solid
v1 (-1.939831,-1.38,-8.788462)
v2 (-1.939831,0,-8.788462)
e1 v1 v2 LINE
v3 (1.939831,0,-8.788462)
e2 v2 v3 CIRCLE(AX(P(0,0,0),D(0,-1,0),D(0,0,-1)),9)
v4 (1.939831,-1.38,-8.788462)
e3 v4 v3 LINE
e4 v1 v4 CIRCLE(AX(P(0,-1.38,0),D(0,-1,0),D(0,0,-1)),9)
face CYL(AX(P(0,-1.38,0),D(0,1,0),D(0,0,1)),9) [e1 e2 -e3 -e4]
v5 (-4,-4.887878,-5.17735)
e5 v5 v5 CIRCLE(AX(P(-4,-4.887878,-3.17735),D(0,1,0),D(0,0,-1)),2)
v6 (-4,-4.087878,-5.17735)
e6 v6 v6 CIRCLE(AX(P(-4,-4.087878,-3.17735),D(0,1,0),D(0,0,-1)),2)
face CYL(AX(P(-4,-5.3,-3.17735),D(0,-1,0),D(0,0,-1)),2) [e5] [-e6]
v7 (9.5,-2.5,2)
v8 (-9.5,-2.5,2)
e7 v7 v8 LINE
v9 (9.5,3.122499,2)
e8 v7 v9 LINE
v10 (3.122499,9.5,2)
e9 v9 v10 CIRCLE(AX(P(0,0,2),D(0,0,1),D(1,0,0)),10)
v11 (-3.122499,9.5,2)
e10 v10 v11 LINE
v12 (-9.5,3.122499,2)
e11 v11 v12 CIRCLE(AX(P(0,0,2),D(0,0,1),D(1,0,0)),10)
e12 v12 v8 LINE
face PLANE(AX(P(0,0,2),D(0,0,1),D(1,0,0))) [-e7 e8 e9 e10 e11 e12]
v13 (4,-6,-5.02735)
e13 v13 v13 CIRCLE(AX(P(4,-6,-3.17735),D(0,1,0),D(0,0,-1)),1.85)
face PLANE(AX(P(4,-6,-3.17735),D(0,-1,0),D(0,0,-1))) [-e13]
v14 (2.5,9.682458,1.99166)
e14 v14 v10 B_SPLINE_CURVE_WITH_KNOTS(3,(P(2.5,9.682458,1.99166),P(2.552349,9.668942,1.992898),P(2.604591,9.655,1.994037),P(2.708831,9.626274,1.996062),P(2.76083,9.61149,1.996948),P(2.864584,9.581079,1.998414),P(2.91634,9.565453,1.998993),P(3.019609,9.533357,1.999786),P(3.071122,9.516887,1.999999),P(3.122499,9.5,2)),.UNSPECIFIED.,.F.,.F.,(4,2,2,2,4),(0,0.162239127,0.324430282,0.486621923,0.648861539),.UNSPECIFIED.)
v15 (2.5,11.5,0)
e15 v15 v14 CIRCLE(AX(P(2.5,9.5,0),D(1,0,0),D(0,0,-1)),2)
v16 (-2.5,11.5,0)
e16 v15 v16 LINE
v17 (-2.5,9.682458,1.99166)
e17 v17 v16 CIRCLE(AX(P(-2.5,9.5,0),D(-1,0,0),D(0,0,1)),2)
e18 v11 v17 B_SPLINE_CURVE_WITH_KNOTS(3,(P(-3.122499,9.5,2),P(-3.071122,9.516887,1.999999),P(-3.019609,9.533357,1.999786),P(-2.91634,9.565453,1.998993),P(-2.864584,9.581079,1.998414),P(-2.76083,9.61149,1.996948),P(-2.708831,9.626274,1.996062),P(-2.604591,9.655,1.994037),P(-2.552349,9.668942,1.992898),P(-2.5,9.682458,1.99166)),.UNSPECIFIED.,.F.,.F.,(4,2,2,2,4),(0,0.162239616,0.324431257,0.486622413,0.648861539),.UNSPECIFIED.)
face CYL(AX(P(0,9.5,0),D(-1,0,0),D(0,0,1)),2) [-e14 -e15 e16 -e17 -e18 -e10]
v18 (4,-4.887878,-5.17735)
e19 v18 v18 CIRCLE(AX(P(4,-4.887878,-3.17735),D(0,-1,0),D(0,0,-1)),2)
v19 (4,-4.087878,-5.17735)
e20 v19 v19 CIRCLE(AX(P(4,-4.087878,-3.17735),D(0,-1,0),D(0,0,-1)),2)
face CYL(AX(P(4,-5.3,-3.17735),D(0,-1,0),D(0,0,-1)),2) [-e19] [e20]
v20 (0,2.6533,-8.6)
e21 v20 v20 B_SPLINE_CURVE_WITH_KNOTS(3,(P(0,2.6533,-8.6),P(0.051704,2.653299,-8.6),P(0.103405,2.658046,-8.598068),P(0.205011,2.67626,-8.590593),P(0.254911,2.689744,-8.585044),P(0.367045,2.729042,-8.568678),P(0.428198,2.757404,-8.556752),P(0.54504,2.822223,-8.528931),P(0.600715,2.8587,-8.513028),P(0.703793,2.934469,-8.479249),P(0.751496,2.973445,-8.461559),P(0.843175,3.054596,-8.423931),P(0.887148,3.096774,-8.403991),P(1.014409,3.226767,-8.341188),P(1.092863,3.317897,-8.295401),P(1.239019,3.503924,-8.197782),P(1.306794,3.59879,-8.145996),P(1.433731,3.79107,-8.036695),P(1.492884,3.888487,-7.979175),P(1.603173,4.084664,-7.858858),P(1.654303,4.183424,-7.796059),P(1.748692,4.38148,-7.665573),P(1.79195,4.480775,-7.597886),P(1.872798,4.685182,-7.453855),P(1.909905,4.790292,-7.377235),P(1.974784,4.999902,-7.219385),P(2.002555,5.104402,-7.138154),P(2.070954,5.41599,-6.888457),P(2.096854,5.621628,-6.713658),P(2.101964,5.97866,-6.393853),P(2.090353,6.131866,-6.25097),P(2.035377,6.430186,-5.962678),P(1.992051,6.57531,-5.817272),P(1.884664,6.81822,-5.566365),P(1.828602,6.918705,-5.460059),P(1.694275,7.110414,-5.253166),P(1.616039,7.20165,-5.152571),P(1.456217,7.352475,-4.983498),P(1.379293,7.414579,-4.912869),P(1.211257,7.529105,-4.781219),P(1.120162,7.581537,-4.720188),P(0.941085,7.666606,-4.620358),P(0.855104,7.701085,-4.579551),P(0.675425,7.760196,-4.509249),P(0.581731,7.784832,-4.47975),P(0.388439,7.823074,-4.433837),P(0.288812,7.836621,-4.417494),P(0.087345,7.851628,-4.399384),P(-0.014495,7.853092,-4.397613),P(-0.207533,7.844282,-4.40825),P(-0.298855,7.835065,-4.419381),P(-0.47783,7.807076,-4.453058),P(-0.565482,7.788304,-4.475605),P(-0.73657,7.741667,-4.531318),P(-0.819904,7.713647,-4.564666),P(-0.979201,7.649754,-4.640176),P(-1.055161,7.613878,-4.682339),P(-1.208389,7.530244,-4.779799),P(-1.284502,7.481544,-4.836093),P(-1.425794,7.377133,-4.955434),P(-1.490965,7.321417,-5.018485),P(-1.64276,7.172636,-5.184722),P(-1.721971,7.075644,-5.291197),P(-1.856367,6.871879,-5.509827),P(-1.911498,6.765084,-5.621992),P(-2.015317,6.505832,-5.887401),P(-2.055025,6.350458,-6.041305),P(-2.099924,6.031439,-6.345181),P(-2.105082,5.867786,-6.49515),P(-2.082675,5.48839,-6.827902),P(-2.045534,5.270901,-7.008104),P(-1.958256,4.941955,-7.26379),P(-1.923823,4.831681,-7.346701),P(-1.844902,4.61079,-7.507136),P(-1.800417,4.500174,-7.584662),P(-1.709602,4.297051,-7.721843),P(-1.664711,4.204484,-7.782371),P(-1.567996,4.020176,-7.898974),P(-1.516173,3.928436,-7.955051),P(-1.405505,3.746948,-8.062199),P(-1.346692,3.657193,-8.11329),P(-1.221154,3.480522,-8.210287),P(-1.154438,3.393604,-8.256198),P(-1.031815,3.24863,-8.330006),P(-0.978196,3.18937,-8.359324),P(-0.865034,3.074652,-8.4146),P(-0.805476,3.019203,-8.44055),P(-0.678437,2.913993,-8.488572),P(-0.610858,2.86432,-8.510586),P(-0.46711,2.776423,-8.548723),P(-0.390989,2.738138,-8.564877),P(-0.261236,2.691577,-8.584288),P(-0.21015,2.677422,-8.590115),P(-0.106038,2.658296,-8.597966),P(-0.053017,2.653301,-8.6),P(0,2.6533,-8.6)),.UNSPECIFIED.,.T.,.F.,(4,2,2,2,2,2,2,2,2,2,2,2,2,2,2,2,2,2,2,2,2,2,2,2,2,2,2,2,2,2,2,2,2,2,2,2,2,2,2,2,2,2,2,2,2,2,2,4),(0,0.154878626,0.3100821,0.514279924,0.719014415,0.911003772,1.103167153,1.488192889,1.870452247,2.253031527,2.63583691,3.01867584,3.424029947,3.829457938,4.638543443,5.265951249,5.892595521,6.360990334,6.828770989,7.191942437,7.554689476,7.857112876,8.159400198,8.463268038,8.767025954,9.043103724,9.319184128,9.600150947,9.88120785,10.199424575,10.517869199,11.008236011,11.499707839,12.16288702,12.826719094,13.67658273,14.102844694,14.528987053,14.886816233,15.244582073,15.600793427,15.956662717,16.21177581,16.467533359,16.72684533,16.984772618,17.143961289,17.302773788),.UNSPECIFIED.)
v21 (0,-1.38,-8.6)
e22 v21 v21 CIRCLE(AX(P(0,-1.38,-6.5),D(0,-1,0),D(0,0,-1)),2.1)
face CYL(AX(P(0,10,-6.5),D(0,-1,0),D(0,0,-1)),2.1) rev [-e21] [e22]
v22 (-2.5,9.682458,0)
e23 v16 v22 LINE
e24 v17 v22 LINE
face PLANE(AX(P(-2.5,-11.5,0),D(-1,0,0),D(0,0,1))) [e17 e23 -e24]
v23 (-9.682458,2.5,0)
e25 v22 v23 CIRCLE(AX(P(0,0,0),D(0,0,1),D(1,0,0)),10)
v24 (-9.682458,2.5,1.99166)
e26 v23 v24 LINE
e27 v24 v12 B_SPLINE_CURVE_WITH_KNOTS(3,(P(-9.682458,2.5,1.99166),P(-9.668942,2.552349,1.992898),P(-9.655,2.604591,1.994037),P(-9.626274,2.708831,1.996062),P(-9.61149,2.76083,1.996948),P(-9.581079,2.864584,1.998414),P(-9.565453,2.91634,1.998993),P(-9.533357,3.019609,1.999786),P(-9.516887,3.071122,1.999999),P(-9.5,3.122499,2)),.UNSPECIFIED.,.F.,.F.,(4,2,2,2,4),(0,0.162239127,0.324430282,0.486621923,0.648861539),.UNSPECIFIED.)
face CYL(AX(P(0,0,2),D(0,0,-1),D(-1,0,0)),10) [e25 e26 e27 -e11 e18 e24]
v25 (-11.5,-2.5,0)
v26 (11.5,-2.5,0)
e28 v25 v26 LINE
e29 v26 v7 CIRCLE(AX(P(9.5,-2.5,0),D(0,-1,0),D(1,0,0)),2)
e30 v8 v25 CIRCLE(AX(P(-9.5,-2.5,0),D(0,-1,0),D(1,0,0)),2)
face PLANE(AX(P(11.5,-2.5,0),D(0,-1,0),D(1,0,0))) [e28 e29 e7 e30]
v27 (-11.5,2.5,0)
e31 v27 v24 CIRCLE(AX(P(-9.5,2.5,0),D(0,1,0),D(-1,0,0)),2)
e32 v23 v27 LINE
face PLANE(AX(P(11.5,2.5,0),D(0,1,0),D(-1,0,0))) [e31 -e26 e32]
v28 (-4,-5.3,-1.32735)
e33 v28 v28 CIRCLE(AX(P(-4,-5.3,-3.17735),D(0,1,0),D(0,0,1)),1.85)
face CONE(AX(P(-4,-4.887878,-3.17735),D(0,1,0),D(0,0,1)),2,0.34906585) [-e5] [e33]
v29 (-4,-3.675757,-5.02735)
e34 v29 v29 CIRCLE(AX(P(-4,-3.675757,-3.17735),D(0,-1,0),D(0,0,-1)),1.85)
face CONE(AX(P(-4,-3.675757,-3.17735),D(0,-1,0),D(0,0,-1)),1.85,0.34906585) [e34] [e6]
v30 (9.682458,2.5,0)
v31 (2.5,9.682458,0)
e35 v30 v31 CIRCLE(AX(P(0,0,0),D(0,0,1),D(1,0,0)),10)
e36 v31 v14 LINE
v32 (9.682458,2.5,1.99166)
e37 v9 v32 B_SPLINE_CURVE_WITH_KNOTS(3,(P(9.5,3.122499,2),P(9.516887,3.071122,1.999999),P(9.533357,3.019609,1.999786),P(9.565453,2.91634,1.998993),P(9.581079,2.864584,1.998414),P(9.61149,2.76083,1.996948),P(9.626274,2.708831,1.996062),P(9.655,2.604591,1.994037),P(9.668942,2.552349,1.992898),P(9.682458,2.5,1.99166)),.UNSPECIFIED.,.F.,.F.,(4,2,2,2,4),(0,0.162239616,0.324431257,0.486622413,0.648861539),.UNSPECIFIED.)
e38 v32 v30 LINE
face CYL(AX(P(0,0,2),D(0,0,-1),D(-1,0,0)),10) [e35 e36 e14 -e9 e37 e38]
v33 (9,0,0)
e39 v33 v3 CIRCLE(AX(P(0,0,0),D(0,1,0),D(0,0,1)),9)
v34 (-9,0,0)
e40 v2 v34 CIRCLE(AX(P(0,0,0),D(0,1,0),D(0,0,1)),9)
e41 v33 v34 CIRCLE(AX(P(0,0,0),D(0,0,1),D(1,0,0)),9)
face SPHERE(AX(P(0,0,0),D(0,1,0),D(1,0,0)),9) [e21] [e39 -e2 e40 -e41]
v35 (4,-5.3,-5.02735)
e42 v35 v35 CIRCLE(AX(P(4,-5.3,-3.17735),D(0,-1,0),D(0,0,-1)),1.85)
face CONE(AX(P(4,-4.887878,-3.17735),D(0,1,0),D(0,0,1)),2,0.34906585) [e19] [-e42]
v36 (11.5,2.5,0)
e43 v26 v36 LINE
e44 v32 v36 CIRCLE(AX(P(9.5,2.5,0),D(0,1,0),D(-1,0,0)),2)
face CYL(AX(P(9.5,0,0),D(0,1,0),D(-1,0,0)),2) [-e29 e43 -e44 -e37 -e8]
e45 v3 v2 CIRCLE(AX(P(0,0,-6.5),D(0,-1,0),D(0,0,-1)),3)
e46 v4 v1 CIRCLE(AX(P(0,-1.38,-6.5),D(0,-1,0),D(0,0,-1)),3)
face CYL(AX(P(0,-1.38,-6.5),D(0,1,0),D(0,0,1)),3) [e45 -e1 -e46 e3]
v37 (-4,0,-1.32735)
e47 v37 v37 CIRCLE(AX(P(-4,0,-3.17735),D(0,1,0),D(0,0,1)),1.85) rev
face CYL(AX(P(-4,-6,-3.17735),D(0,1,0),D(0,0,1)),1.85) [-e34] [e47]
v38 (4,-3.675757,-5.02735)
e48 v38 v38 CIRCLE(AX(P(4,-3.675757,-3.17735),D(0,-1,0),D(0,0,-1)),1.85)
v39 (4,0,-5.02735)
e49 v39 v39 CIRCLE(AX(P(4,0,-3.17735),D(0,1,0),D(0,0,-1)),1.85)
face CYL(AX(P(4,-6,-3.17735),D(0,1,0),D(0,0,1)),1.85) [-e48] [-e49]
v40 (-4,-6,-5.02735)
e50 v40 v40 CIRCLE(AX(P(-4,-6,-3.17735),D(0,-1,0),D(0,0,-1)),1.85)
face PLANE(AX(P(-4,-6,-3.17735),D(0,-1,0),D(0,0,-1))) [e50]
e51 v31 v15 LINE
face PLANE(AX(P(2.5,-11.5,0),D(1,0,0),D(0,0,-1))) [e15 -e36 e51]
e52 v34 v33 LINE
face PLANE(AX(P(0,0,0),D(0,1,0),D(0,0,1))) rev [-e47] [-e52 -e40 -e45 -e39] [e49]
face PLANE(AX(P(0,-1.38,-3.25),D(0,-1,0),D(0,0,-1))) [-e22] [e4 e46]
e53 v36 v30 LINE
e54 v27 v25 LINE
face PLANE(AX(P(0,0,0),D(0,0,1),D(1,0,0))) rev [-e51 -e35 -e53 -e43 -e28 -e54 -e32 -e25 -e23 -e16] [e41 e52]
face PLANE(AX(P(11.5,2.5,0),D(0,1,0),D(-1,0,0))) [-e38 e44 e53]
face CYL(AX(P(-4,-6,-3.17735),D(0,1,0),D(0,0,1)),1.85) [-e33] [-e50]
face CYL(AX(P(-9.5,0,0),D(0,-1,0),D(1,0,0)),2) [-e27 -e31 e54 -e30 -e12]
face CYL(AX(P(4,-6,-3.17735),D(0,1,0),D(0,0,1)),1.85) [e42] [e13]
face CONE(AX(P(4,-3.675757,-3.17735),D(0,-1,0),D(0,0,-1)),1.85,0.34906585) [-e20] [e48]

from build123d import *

# Parameters (mm, degrees)
SKETCH_1_R               = 10
EXTRUDE_1_DEPTH          = 2
REVOLVE_1_ANGLE          = 180
SKETCH_5_R               = 2.1
CUT_EXTRUDE_1_DEPTH      = 10
SKETCH_6_R               = 1.85
EXTRUDE_2_DEPTH          = 6
EXTRUDE_START            = 1.38
SKETCH_7_R               = 2.1
EXTRUDE_3_DEPTH          = 1.38
SKETCH_10_W              = 5
SKETCH_10_H              = 23
EXTRUDE_4_DEPTH          = 2
PATTERN_CIRCULAR_3_COUNT = 4
FILLET_3_R               = 2
SKETCH_11_W              = 19.364916732
SKETCH_11_H              = 12.045075347
CUT_EXTRUDE_2_DEPTH      = 10


with BuildPart() as part:
    # 草图1 → 凸台-拉伸1 (new body)
    with BuildSketch(Plane.XY):
        Circle(SKETCH_1_R)
    extrude(amount=EXTRUDE_1_DEPTH)

    # 草图2 → 旋转1 (revolve)
    with BuildSketch(Plane(origin=(0, 0, 0), x_dir=(-1, 0, 0), z_dir=(0, 0, -1))):
        with BuildLine():
            Line((0, 9), (0, 0))
            Line((0, 0), (9, 0))
            ThreePointArc((9, 0), (6.363961031, 6.363961031), (0, 9))
        make_face()
    revolve(axis=Axis((0, 0, 0), (0, -1, 0)), revolution_arc=REVOLVE_1_ANGLE)

    # 草图5 → 切除-拉伸1 (cut)
    with BuildSketch(Plane.XZ):
        with Locations(Location((0, -6.5, 0), (0, 0, 270))):
            Circle(SKETCH_5_R)
    extrude(amount=-CUT_EXTRUDE_1_DEPTH, mode=Mode.SUBTRACT)

    # 草图6 → 凸台-拉伸2 (add)
    with BuildSketch(Plane.XZ):
        with Locations(Location((-4, -3.177350455, 0), (0, 0, 90))):
            Circle(SKETCH_6_R)
    extrude_2 = extrude(amount=EXTRUDE_2_DEPTH)

    # 镜向1: 凸台-拉伸2 across plane
    add(extrude_2.mirror(Plane(origin=(0, 0, 0), x_dir=(0, 0, 1), z_dir=(1, 0, 0))))

    # 草图7 → 凸台-拉伸3 (add)
    with BuildSketch(Plane.XZ.offset(EXTRUDE_START)):
        with BuildLine():
            ThreePointArc((1.939830866, -8.788461538), (0, -3.5), (-1.939830866, -8.788461538))
            ThreePointArc((-1.939830866, -8.788461538), (0, -9), (1.939830866, -8.788461538))
        make_face()
        with Locations(Location((0, -6.5, 0), (0, 0, 270))):
            Circle(SKETCH_7_R, mode=Mode.SUBTRACT)
    extrude(amount=-EXTRUDE_3_DEPTH)

    # 草图8 → 旋转2 (revolve)
    with BuildSketch(Plane.XY.offset(-3.177350455), mode=Mode.PRIVATE) as revolve_2_sk:
        Polygon((4, -3.675756774), (2.15, -3.675756774), (2, -4.087878387), (2, -4.887878387), (2.15, -5.3), (4, -5.3), align=None)
    revolve_2 = revolve(revolve_2_sk.sketch.rotate(Axis((4, -5.3, -3.177350455), (0, 1, 0)), 270), axis=Axis((4, -5.3, -3.177350455), (0, 1, 0)))

    # 镜向2: 旋转2 across plane
    add(revolve_2.mirror(Plane(origin=(0, 0, 0), x_dir=(0, 0, 1), z_dir=(1, 0, 0))))

    # 草图10 → 凸台-拉伸4 (add)
    with BuildSketch(Plane.XY.offset(2)):
        Rectangle(SKETCH_10_W, SKETCH_10_H)
    extrude_4 = extrude(amount=-EXTRUDE_4_DEPTH)

    # 阵列(圆周)3: 凸台-拉伸4 ×4 about axis
    pattern_circular_3_axis = Axis((0, 0, 0), (0, 0, 1))
    for i in range(1, PATTERN_CIRCULAR_3_COUNT):
        add(extrude_4.rotate(pattern_circular_3_axis, i * 360 / PATTERN_CIRCULAR_3_COUNT))

    # 圆角3
    fillet_3_edges = [part.edges().sort_by_distance(p)[0] for p in [
        (0, 11.5, 2),
        (0, -11.5, 2),
        (11.5, 0, 2),
        (-11.5, 0, 2),
    ]]
    fillet(fillet_3_edges, radius=FILLET_3_R - 0.0001)  # a hair under: the kernel refuses the full size

    # 草图11 → 切除-拉伸2 (cut)
    with BuildSketch(Plane(origin=(0, 0, 0), x_dir=(-1, 0, 0), z_dir=(0, 0, -1))):
        with Locations((0, -8.522537674)):
            Rectangle(SKETCH_11_W, SKETCH_11_H)
    extrude(amount=-CUT_EXTRUDE_2_DEPTH, mode=Mode.SUBTRACT)


solid = part.part
